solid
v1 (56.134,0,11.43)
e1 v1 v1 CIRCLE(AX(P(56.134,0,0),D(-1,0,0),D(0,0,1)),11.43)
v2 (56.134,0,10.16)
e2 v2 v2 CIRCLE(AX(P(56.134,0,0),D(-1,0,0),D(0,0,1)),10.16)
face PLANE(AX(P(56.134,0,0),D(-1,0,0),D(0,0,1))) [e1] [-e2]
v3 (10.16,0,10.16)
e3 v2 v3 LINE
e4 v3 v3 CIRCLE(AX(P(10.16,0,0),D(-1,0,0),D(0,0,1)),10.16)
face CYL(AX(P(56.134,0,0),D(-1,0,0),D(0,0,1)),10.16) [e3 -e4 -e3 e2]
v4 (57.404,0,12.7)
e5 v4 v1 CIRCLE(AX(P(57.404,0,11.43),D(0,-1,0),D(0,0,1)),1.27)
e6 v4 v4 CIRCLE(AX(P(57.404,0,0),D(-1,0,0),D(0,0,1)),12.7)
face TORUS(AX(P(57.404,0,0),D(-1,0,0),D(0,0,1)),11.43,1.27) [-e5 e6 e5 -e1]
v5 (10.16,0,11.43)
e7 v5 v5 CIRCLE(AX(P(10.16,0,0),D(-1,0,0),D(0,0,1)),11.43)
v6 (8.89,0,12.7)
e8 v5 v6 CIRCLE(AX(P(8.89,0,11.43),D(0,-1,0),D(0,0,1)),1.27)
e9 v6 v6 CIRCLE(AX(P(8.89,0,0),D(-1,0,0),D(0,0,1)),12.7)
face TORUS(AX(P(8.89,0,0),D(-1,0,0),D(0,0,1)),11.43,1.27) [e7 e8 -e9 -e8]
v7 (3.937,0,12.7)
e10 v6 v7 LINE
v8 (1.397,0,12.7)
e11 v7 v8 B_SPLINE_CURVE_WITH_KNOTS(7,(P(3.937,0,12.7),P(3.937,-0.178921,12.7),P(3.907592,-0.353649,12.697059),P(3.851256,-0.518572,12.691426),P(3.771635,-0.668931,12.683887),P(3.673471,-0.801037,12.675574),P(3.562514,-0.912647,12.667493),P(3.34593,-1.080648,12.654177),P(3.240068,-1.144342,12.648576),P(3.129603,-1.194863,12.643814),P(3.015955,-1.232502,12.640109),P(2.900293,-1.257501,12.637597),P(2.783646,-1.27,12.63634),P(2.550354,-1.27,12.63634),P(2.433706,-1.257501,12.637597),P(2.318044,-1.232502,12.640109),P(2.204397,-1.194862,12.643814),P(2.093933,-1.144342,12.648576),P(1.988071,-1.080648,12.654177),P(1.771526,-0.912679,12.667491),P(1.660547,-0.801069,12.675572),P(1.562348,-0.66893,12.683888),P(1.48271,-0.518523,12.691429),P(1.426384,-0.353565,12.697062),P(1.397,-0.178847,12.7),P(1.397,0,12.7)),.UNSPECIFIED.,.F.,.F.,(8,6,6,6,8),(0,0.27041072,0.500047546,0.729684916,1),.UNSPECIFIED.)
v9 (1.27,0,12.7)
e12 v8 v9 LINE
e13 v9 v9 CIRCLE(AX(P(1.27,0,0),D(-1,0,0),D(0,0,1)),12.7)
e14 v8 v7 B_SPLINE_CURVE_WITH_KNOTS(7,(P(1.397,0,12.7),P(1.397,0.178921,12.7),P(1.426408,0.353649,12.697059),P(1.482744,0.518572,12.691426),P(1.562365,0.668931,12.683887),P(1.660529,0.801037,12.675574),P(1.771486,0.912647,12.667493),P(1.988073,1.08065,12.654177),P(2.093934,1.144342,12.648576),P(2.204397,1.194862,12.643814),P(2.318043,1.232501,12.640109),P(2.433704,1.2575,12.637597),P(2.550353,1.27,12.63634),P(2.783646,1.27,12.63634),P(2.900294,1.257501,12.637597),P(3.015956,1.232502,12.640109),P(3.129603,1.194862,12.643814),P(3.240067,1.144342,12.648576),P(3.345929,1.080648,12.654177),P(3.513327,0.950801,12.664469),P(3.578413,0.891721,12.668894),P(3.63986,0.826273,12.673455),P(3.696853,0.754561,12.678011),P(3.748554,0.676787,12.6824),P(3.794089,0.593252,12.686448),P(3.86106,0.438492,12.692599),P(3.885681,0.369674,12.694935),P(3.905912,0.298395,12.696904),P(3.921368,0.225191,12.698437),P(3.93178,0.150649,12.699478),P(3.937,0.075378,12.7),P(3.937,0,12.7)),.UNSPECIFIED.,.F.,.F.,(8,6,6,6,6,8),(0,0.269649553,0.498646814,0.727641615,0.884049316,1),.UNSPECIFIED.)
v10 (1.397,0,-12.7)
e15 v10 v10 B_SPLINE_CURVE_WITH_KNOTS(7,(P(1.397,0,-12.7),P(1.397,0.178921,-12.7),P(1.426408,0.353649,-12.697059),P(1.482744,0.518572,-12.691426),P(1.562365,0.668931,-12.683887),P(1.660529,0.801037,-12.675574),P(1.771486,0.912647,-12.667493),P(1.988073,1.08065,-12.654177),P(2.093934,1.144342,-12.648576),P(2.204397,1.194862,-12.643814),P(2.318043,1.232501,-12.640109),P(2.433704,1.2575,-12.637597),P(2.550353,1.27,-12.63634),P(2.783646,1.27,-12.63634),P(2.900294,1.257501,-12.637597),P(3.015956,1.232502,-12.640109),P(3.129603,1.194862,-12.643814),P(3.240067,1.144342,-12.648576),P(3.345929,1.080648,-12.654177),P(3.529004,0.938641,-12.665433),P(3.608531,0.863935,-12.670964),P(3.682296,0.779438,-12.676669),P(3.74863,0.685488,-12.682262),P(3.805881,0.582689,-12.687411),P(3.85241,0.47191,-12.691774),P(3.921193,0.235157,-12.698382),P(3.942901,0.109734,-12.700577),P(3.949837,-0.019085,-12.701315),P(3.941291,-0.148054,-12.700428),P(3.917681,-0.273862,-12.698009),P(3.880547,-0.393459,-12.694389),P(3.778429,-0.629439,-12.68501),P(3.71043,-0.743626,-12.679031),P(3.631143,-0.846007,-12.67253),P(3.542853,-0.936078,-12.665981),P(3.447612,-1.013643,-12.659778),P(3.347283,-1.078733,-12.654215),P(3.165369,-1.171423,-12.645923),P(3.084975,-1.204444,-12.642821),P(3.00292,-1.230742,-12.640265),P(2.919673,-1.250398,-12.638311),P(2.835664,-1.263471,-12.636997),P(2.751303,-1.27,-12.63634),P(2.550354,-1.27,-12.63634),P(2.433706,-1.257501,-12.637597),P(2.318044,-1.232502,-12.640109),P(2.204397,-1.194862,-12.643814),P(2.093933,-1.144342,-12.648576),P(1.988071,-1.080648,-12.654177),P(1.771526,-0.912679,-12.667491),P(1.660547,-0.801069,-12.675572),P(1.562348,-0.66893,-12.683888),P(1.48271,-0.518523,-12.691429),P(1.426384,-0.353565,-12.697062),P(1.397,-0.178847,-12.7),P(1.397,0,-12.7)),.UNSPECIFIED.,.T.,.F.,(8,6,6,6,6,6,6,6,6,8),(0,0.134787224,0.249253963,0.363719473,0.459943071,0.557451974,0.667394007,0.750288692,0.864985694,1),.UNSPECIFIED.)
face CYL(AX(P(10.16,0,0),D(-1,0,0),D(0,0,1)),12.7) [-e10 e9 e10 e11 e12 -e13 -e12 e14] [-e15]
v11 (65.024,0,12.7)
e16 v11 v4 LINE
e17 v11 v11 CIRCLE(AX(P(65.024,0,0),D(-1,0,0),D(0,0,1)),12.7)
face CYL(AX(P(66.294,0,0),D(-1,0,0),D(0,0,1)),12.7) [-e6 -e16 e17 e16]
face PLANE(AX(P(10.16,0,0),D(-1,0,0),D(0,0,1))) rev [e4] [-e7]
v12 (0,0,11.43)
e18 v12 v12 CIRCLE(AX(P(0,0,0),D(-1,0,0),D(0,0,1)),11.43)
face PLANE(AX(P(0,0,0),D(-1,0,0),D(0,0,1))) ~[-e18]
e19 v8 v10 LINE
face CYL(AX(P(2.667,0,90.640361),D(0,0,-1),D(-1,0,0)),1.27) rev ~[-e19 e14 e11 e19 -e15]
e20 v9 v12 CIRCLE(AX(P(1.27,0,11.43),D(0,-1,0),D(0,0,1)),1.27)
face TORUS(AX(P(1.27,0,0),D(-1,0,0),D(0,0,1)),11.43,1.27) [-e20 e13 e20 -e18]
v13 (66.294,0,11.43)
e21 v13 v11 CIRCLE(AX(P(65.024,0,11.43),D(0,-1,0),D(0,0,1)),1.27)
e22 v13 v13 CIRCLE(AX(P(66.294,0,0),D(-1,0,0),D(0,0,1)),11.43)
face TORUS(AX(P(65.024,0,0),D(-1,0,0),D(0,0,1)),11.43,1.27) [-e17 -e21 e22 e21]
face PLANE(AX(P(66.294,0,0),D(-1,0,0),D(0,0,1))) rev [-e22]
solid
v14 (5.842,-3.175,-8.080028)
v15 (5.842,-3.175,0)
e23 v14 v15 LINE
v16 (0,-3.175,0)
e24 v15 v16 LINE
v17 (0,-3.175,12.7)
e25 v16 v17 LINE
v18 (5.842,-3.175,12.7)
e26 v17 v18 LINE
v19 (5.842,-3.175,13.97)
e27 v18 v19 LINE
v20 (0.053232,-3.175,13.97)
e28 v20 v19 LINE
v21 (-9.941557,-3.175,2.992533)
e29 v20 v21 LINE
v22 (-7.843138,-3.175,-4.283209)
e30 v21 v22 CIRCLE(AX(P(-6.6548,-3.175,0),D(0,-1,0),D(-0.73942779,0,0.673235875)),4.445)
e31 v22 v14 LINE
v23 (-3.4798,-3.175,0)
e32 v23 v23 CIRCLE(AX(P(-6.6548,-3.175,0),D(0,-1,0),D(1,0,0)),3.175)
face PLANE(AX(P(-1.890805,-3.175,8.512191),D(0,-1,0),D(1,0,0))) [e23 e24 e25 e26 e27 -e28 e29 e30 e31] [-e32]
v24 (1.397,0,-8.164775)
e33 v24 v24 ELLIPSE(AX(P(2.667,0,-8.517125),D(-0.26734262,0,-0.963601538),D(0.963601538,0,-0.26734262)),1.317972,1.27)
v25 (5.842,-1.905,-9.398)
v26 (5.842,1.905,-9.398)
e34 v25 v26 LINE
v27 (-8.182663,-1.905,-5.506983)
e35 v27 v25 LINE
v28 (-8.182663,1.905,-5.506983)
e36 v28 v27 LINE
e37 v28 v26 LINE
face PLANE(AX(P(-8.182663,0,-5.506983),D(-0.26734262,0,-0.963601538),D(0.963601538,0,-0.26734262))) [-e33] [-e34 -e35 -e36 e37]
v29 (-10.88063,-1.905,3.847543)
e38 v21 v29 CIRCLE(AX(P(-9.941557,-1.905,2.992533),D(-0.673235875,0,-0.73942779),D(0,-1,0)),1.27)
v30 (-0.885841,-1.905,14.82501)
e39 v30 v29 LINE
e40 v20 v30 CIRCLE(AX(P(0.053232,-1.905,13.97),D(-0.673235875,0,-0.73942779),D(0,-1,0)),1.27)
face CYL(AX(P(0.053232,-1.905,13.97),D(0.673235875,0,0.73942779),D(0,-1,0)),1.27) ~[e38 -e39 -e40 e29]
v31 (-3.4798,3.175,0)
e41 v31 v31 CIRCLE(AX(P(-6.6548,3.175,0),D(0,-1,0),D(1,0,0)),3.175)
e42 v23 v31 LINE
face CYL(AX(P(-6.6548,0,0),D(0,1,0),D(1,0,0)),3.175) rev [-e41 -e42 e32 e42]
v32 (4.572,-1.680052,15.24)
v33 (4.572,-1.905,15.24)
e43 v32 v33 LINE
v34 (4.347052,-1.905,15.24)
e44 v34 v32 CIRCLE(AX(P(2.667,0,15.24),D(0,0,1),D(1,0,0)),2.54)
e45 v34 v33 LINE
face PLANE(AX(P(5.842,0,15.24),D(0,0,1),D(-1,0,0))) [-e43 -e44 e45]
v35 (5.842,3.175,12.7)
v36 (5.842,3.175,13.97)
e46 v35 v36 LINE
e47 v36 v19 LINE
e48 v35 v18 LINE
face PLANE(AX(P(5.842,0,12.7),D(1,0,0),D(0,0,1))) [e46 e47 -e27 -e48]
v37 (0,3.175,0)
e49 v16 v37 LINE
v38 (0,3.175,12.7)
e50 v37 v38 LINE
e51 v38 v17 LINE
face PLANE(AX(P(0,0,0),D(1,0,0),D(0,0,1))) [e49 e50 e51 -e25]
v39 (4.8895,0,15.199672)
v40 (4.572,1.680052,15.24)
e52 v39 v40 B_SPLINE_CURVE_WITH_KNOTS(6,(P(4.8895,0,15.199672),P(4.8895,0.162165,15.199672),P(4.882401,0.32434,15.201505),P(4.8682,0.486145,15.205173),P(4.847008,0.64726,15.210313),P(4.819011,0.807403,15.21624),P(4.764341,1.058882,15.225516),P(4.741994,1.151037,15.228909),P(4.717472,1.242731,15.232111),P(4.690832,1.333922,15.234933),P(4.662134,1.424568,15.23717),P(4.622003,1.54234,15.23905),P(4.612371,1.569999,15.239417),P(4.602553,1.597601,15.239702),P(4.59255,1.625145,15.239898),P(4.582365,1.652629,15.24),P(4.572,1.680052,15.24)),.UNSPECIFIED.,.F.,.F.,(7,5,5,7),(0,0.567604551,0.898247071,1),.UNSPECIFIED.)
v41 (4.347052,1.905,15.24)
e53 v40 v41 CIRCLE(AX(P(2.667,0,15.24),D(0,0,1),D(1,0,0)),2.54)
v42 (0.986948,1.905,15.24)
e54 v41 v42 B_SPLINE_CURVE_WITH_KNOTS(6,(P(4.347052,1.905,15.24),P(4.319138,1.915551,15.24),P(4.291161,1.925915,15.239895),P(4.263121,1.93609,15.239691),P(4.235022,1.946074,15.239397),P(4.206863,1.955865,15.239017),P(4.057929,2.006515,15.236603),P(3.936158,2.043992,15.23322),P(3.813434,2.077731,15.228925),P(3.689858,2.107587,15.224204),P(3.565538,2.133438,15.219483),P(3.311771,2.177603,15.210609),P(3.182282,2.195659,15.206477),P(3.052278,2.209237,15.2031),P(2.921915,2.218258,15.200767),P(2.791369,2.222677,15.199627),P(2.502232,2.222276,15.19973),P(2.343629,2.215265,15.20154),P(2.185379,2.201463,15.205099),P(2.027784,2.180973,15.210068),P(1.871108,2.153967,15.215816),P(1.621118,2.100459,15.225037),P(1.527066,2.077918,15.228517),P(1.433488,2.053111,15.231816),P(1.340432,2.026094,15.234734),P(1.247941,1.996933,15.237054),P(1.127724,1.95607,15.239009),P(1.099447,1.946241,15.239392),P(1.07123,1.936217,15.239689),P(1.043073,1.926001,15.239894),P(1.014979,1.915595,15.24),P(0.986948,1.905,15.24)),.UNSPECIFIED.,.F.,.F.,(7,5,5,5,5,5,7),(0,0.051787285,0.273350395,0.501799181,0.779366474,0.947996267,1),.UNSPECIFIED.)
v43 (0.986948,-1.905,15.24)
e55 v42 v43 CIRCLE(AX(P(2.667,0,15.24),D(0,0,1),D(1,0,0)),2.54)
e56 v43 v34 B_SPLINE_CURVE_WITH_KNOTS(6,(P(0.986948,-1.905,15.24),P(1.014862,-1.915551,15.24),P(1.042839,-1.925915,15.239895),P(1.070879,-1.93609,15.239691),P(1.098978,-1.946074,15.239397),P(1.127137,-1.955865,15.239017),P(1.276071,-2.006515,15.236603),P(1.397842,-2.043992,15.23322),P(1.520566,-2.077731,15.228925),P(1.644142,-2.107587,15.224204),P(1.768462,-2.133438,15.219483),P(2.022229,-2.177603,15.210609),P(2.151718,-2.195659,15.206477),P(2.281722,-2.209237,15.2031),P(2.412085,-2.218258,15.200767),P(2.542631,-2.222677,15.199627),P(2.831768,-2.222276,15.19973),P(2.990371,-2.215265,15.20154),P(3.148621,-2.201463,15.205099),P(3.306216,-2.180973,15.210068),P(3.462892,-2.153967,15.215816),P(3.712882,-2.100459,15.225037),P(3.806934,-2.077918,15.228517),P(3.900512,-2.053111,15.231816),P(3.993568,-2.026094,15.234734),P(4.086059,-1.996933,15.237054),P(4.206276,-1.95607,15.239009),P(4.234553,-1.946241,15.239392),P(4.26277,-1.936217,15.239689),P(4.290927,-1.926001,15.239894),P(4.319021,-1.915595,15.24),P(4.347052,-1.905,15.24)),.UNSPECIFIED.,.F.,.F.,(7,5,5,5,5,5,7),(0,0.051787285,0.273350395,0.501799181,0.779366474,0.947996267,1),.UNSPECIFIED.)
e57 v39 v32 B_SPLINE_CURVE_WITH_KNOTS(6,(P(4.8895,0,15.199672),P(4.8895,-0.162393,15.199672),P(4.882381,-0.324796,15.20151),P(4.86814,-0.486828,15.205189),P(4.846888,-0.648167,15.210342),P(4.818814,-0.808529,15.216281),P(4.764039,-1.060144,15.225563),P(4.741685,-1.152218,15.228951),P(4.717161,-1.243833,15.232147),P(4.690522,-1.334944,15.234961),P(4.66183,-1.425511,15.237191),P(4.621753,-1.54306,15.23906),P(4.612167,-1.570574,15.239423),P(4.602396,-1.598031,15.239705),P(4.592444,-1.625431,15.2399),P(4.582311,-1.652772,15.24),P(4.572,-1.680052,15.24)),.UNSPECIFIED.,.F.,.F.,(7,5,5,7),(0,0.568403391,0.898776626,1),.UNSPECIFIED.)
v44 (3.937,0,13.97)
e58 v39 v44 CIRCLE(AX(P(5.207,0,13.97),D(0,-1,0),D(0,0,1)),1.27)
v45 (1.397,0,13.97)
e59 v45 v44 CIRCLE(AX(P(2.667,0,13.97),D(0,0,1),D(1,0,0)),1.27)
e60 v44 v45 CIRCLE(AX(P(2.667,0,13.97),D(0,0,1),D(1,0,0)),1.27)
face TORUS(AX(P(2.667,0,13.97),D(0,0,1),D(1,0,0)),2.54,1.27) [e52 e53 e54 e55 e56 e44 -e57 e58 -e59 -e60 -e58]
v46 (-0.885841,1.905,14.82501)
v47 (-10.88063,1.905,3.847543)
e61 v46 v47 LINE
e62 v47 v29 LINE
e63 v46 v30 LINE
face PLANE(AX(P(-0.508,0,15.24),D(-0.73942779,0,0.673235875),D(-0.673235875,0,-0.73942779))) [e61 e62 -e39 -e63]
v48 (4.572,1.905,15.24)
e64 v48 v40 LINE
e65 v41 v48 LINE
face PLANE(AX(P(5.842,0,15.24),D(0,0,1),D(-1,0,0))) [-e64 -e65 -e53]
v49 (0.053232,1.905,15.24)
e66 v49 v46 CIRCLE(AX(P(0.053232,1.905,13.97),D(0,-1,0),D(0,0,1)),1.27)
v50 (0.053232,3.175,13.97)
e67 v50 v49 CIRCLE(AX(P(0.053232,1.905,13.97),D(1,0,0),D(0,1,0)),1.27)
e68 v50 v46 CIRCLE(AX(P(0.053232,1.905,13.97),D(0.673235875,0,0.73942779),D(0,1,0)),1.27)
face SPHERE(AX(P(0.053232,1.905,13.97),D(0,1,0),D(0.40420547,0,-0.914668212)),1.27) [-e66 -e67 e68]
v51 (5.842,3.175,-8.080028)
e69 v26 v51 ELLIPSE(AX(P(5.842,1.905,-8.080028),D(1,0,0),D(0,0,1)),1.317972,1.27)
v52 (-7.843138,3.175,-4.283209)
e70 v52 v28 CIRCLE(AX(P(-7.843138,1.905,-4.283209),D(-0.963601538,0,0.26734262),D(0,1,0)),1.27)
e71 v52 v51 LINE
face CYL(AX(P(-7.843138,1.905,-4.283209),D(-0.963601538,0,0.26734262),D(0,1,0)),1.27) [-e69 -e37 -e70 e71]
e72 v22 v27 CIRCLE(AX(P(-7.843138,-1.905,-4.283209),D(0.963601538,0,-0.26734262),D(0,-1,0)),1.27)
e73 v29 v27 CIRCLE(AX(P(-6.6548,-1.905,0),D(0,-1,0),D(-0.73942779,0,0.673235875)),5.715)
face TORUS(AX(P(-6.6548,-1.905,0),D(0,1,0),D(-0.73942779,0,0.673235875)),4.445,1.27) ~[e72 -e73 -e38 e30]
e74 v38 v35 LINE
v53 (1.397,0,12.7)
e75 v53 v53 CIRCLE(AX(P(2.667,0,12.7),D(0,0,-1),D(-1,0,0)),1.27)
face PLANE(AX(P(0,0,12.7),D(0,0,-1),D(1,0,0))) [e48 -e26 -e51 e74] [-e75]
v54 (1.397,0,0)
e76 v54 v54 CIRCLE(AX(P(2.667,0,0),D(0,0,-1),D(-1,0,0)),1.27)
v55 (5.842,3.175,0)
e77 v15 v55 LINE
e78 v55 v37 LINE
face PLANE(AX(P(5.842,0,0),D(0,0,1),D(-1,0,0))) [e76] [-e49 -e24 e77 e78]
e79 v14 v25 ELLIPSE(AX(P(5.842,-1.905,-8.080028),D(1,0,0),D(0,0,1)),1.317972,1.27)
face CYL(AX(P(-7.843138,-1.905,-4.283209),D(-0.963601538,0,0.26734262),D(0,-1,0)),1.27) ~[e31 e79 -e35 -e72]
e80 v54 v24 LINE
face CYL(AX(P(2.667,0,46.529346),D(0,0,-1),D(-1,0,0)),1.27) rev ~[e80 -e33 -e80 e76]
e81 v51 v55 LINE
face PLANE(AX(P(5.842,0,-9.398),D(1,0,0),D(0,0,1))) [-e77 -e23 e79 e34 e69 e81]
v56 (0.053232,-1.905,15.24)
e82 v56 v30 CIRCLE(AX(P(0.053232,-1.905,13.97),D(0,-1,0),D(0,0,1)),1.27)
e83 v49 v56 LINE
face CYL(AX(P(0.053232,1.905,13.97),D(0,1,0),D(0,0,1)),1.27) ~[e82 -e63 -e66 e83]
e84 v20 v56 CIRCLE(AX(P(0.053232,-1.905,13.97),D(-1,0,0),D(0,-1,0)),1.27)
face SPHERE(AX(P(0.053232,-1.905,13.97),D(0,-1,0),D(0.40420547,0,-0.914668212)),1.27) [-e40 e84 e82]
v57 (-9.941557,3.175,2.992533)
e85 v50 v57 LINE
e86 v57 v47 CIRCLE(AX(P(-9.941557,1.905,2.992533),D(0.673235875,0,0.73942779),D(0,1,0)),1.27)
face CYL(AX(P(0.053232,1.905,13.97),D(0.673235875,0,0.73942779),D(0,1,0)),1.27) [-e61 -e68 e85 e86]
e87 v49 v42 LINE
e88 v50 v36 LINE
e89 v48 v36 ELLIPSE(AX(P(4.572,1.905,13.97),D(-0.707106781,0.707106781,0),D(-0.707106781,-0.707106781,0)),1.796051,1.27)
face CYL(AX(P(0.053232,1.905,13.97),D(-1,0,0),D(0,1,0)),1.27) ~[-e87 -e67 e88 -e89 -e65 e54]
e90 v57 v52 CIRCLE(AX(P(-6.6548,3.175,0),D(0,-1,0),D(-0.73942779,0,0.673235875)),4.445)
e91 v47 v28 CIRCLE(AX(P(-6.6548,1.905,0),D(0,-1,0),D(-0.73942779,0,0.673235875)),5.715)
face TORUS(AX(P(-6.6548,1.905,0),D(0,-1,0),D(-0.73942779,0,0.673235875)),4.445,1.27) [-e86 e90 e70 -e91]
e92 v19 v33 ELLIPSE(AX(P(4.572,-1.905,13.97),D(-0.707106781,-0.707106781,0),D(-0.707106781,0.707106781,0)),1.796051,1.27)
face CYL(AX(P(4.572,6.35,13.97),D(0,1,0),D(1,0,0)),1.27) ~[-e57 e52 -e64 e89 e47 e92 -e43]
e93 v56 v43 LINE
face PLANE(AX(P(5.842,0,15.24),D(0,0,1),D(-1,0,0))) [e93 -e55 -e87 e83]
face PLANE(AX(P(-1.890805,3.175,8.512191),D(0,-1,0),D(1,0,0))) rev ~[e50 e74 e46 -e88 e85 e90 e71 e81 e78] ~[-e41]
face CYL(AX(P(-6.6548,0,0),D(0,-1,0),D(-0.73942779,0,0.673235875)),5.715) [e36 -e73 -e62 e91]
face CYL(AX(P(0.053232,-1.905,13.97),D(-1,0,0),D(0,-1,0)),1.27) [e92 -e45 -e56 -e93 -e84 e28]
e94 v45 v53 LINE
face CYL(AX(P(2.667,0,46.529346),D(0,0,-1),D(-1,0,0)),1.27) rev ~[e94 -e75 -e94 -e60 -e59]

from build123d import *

# Parameters (mm, degrees)
F0_W           = 5.842
F0_H           = 12.7
F0_R           = 3.175
F2_DEPTH       = 3.175
F5_D           = 2.54
F5_2_D         = 2.54
F6_F1_R        = 1.27
F6_F2_R        = 1.27
F6_F3_R        = 1.27
F6_F4_R        = 1.27
F6_2_T1_DEPTH  = 8.9637681337
F6_2_T3_DEPTH  = 14.8458939279
F6_2_T5_DEPTH  = 17.7294216388
F6_2_T7_DEPTH  = 12.7
F6_2_T9_DEPTH  = 3.81
F6_2_T14_DEPTH = 1.27
F6_2_T20_DEPTH = 1.27
F6_2_T24_ANGLE = 116.8111069241
F6_2_T26_ANGLE = 116.8111069241


# Not quite as in the source:
# - a fillet or chamfer that OpenCascade refuses, or shapes differently, is made with other operations: its cross-section is extruded or revolved along the edge and cut away or added


with BuildPart() as f1:
    # F0 (on Front) → F1 (revolve)
    with BuildSketch(Plane.XZ):
        Polygon((5.842, 12.7), (5.842, 0), (66.294, 0), (66.294, 12.7), (56.134, 12.7), (56.134, 10.16), (10.16, 10.16), (10.16, 12.7), align=None)
        with Locations((2.921, 6.35)):
            Rectangle(F0_W, F0_H)
    revolve(axis=Axis((33.147, 0, 0), (-1, 0, 0)))

    # F5 (through all)
    with Locations(Plane.XY.offset(15.24)):
        with Locations((2.667, 0)):
            Hole(F5_D / 2)

    # F6: fillet of radius 1.27 on 4 edges, made by hand

    # F6_f1
    f6_f1_edges = [f1.edges().sort_by_distance(p)[0] for p in [
        (66.294, 0, -12.7),
    ]]
    fillet(f6_f1_edges, radius=F6_F1_R)

    # F6_f2
    f6_f2_edges = [f1.edges().sort_by_distance(p)[0] for p in [
        (56.134, 0, -12.7),
    ]]
    fillet(f6_f2_edges, radius=F6_F2_R)

    # F6_f3
    f6_f3_edges = [f1.edges().sort_by_distance(p)[0] for p in [
        (10.16, 0, -12.7),
    ]]
    fillet(f6_f3_edges, radius=F6_F3_R)

    # F6_f4
    f6_f4_edges = [f1.edges().sort_by_distance(p)[0] for p in [
        (0, 0, -12.7),
    ]]
    fillet(f6_f4_edges, radius=F6_F4_R)


with BuildPart() as f2:
    # F0 (on Front) → F2 (new body, symmetric)
    with BuildSketch(Plane.XZ):
        with BuildLine():
            Line((-0.9398, 0), (0, 0))
            Line((0, 0), (0, 12.7))
            Line((0, 12.7), (5.842, 12.7))
            Line((5.842, 12.7), (5.842, 15.24))
            Line((5.842, 15.24), (-0.508, 15.24))
            Line((-0.508, 15.24), (-10.8806298187, 3.8475430269))
            ThreePointArc((-10.8806298187, 3.8475430269), (-4.5919612295, 5.3297205562), (-0.9398, 0))
        make_face()
        with BuildLine():
            ThreePointArc((-8.1826630726, -5.5069827884), (-3.1957909266, -4.5493385486), (-0.9398, 0))
            ThreePointArc((-0.9398, 0), (-4.5919612295, 5.3297205562), (-10.8806298187, 3.8475430269))
            ThreePointArc((-10.8806298187, 3.8475430269), (-12.1459778134, -1.5837270034), (-8.1826630726, -5.5069827884))
        make_face()
        with Locations((-6.6548, 0)):
            Circle(F0_R, mode=Mode.SUBTRACT)
        with BuildLine():
            Line((5.842, 0), (0, 0))
            Line((0, 0), (-0.9398, 0))
            ThreePointArc((-0.9398, 0), (-3.1957909266, -4.5493385486), (-8.1826630726, -5.5069827884))
            Line((-8.1826630726, -5.5069827884), (5.842, -9.398))
            Line((5.842, -9.398), (5.842, 0))
        make_face()
    extrude(amount=F2_DEPTH, both=True)

    # F5#2 (through all)
    with Locations(Plane.XY.offset(15.24)):
        with Locations((2.667, 0)):
            Hole(F5_2_D / 2)

    # F6#2: fillet of radius 1.27 on 11 edges, made by hand

    # F6_2_s2 → F6_2_t1 (cut)
    with BuildSketch(Plane.YZ.offset(0.0532318663)):
        with BuildLine():
            ThreePointArc((-3.175, 13.97), (-2.8030256121, 14.8680256121), (-1.905, 15.24))
            Line((-1.905, 15.24), (-3.175, 15.24))
            Line((-3.175, 15.24), (-3.175, 13.97))
        make_face()
        with BuildLine():
            ThreePointArc((3.175, 13.97), (2.8030256121, 14.8680256121), (1.905, 15.24))
            Line((1.905, 15.24), (3.175, 15.24))
            Line((3.175, 15.24), (3.175, 13.97))
        make_face()
    extrude(amount=F6_2_T1_DEPTH, mode=Mode.SUBTRACT)

    # F6_2_s4 → F6_2_t3 (cut)
    with BuildSketch(Plane(origin=(6.9785232931, 0, 7.6646451037), x_dir=(0, 1, 0), z_dir=(-0.6732358752, 0, -0.7394277898))):
        with BuildLine():
            ThreePointArc((-3.175, -9.3657440555), (-2.8030256121, -10.2637696676), (-1.905, -10.6357440555))
            Line((-1.905, -10.6357440555), (-3.175, -10.6357440555))
            Line((-3.175, -10.6357440555), (-3.175, -9.3657440555))
        make_face()
        with BuildLine():
            ThreePointArc((3.175, -9.3657440555), (2.8030256121, -10.2637696676), (1.905, -10.6357440555))
            Line((1.905, -10.6357440555), (3.175, -10.6357440555))
            Line((3.175, -10.6357440555), (3.175, -9.3657440555))
        make_face()
    extrude(amount=F6_2_T3_DEPTH, mode=Mode.SUBTRACT)

    # F6_2_s6 → F6_2_t5 (cut)
    with BuildSketch(Plane(origin=(-6.179167626, 0, 1.7143547379), x_dir=(0, 1, 0), z_dir=(0.9636015378, 0, -0.2673426199))):
        with BuildLine():
            ThreePointArc((-3.175, -6.2241116667), (-2.8030256121, -7.1221372788), (-1.905, -7.4941116667))
            Line((-1.905, -7.4941116667), (-3.175, -7.4941116667))
            Line((-3.175, -7.4941116667), (-3.175, -6.2241116667))
        make_face()
        with BuildLine():
            ThreePointArc((3.175, -6.2241116667), (2.8030256121, -7.1221372788), (1.905, -7.4941116667))
            Line((1.905, -7.4941116667), (3.175, -7.4941116667))
            Line((3.175, -7.4941116667), (3.175, -6.2241116667))
        make_face()
    extrude(amount=F6_2_T5_DEPTH, mode=Mode.SUBTRACT)

    # F6_2_s8 → F6_2_t7 (cut)
    with BuildSketch(Plane.XZ.offset(-6.35)):
        with BuildLine():
            ThreePointArc((5.842, 13.97), (5.4700256121, 14.8680256121), (4.572, 15.24))
            Line((4.572, 15.24), (5.842, 15.24))
            Line((5.842, 15.24), (5.842, 13.97))
        make_face()
    extrude(amount=F6_2_T7_DEPTH, mode=Mode.SUBTRACT)

    # F6_2_s10 → F6_2_t9 (cut)
    with BuildSketch(Plane.XZ.offset(-1.905)):
        with BuildLine():
            ThreePointArc((0.0532318663, 15.24), (-0.4601090812, 15.1316286289), (-0.8858414267, 14.8250095615))
            Line((-0.8858414267, 14.8250095615), (-0.508, 15.24))
            Line((-0.508, 15.24), (0.0532318663, 15.24))
        make_face()
    extrude(amount=F6_2_T9_DEPTH, mode=Mode.SUBTRACT)


with BuildPart() as f6_2_tool12:
    # F6_2_s13 → F6_2_t14 (new body)
    with BuildSketch(Plane.XZ.offset(1.905)):
        Polygon((0.0532318663, 13.97), (0.0532318663, 15.24), (-0.508, 15.24), (-0.8858414267, 14.8250095615), align=None)
    extrude(amount=F6_2_T14_DEPTH)

    # F6_2_s15 → F6_2_t16 (revolve, cut)
    with BuildSketch(Plane(origin=(0.0532318663, -1.905, 13.97), x_dir=(0.4042054705, 0, -0.9146682118), z_dir=(-0.9146682118, 0, -0.4042054705))):
        with BuildLine():
            ThreePointArc((0, -1.27), (1.27, 0), (0, 1.27))
            Line((0, 1.27), (0, -1.27))
        make_face()
    revolve(axis=Axis((0.0532318663, -1.905, 13.97), (0, -1, 0)), mode=Mode.SUBTRACT)


with BuildPart() as f2_1:
    add(f2.part)

    # F6_2_t11: cut F6_2_tool12
    add(f6_2_tool12.part, mode=Mode.SUBTRACT)


with BuildPart() as f6_2_tool18:
    # F6_2_s19 → F6_2_t20 (new body)
    with BuildSketch(Plane.XZ.offset(-1.905)):
        Polygon((0.0532318663, 13.97), (0.0532318663, 15.24), (-0.508, 15.24), (-0.8858414267, 14.8250095615), align=None)
    extrude(amount=-F6_2_T20_DEPTH)

    # F6_2_s21 → F6_2_t22 (revolve, cut)
    with BuildSketch(Plane(origin=(0.0532318663, 1.905, 13.97), x_dir=(0.4042054705, 0, -0.9146682118), z_dir=(0.9146682118, 0, 0.4042054705))):
        with BuildLine():
            ThreePointArc((0, -1.27), (1.27, 0), (0, 1.27))
            Line((0, 1.27), (0, -1.27))
        make_face()
    revolve(axis=Axis((0.0532318663, 1.905, 13.97), (0, 1, 0)), mode=Mode.SUBTRACT)


with BuildPart() as f2_2:
    add(f2_1.part)

    # F6_2_t17: cut F6_2_tool18
    add(f6_2_tool18.part, mode=Mode.SUBTRACT)

    # F6_2_s23 → F6_2_t24 (revolve, cut)
    with BuildSketch(Plane(origin=(-3.0162650989, 0, -3.3128214309), x_dir=(0, 1, 0), z_dir=(0.6732358752, 0, 0.7394277898))):
        with BuildLine():
            ThreePointArc((-3.175, 9.3657440555), (-2.8030256121, 10.2637696676), (-1.905, 10.6357440555))
            Line((-1.905, 10.6357440555), (-3.175, 10.6357440555))
            Line((-3.175, 10.6357440555), (-3.175, 9.3657440555))
        make_face()
    revolve(axis=Axis((-6.6548, -3.175, 0), (0, -1, 0)), revolution_arc=F6_2_T24_ANGLE, mode=Mode.SUBTRACT)

    # F6_2_s25 → F6_2_t26 (revolve, cut)
    with BuildSketch(Plane(origin=(-3.0162650989, 0, -3.3128214309), x_dir=(0, 1, 0), z_dir=(0.6732358752, 0, 0.7394277898))):
        with BuildLine():
            ThreePointArc((3.175, 9.3657440555), (2.8030256121, 10.2637696676), (1.905, 10.6357440555))
            Line((1.905, 10.6357440555), (3.175, 10.6357440555))
            Line((3.175, 10.6357440555), (3.175, 9.3657440555))
        make_face()
    revolve(axis=Axis((-6.6548, 3.175, 0), (0, -1, 0)), revolution_arc=F6_2_T26_ANGLE, mode=Mode.SUBTRACT)

    # F6_2_s27 → F6_2_t28 (revolve, cut)
    with BuildSketch(Plane.XZ):
        with BuildLine():
            ThreePointArc((5.207, 15.24), (4.3089743879, 14.8680256121), (3.937, 13.97))
            Line((3.937, 13.97), (3.937, 15.24))
            Line((3.937, 15.24), (5.207, 15.24))
        make_face()
    revolve(axis=Axis((2.667, 0, 15.24), (0, 0, 1)), mode=Mode.SUBTRACT)


solid = Compound([f1.part, f2_2.part])
